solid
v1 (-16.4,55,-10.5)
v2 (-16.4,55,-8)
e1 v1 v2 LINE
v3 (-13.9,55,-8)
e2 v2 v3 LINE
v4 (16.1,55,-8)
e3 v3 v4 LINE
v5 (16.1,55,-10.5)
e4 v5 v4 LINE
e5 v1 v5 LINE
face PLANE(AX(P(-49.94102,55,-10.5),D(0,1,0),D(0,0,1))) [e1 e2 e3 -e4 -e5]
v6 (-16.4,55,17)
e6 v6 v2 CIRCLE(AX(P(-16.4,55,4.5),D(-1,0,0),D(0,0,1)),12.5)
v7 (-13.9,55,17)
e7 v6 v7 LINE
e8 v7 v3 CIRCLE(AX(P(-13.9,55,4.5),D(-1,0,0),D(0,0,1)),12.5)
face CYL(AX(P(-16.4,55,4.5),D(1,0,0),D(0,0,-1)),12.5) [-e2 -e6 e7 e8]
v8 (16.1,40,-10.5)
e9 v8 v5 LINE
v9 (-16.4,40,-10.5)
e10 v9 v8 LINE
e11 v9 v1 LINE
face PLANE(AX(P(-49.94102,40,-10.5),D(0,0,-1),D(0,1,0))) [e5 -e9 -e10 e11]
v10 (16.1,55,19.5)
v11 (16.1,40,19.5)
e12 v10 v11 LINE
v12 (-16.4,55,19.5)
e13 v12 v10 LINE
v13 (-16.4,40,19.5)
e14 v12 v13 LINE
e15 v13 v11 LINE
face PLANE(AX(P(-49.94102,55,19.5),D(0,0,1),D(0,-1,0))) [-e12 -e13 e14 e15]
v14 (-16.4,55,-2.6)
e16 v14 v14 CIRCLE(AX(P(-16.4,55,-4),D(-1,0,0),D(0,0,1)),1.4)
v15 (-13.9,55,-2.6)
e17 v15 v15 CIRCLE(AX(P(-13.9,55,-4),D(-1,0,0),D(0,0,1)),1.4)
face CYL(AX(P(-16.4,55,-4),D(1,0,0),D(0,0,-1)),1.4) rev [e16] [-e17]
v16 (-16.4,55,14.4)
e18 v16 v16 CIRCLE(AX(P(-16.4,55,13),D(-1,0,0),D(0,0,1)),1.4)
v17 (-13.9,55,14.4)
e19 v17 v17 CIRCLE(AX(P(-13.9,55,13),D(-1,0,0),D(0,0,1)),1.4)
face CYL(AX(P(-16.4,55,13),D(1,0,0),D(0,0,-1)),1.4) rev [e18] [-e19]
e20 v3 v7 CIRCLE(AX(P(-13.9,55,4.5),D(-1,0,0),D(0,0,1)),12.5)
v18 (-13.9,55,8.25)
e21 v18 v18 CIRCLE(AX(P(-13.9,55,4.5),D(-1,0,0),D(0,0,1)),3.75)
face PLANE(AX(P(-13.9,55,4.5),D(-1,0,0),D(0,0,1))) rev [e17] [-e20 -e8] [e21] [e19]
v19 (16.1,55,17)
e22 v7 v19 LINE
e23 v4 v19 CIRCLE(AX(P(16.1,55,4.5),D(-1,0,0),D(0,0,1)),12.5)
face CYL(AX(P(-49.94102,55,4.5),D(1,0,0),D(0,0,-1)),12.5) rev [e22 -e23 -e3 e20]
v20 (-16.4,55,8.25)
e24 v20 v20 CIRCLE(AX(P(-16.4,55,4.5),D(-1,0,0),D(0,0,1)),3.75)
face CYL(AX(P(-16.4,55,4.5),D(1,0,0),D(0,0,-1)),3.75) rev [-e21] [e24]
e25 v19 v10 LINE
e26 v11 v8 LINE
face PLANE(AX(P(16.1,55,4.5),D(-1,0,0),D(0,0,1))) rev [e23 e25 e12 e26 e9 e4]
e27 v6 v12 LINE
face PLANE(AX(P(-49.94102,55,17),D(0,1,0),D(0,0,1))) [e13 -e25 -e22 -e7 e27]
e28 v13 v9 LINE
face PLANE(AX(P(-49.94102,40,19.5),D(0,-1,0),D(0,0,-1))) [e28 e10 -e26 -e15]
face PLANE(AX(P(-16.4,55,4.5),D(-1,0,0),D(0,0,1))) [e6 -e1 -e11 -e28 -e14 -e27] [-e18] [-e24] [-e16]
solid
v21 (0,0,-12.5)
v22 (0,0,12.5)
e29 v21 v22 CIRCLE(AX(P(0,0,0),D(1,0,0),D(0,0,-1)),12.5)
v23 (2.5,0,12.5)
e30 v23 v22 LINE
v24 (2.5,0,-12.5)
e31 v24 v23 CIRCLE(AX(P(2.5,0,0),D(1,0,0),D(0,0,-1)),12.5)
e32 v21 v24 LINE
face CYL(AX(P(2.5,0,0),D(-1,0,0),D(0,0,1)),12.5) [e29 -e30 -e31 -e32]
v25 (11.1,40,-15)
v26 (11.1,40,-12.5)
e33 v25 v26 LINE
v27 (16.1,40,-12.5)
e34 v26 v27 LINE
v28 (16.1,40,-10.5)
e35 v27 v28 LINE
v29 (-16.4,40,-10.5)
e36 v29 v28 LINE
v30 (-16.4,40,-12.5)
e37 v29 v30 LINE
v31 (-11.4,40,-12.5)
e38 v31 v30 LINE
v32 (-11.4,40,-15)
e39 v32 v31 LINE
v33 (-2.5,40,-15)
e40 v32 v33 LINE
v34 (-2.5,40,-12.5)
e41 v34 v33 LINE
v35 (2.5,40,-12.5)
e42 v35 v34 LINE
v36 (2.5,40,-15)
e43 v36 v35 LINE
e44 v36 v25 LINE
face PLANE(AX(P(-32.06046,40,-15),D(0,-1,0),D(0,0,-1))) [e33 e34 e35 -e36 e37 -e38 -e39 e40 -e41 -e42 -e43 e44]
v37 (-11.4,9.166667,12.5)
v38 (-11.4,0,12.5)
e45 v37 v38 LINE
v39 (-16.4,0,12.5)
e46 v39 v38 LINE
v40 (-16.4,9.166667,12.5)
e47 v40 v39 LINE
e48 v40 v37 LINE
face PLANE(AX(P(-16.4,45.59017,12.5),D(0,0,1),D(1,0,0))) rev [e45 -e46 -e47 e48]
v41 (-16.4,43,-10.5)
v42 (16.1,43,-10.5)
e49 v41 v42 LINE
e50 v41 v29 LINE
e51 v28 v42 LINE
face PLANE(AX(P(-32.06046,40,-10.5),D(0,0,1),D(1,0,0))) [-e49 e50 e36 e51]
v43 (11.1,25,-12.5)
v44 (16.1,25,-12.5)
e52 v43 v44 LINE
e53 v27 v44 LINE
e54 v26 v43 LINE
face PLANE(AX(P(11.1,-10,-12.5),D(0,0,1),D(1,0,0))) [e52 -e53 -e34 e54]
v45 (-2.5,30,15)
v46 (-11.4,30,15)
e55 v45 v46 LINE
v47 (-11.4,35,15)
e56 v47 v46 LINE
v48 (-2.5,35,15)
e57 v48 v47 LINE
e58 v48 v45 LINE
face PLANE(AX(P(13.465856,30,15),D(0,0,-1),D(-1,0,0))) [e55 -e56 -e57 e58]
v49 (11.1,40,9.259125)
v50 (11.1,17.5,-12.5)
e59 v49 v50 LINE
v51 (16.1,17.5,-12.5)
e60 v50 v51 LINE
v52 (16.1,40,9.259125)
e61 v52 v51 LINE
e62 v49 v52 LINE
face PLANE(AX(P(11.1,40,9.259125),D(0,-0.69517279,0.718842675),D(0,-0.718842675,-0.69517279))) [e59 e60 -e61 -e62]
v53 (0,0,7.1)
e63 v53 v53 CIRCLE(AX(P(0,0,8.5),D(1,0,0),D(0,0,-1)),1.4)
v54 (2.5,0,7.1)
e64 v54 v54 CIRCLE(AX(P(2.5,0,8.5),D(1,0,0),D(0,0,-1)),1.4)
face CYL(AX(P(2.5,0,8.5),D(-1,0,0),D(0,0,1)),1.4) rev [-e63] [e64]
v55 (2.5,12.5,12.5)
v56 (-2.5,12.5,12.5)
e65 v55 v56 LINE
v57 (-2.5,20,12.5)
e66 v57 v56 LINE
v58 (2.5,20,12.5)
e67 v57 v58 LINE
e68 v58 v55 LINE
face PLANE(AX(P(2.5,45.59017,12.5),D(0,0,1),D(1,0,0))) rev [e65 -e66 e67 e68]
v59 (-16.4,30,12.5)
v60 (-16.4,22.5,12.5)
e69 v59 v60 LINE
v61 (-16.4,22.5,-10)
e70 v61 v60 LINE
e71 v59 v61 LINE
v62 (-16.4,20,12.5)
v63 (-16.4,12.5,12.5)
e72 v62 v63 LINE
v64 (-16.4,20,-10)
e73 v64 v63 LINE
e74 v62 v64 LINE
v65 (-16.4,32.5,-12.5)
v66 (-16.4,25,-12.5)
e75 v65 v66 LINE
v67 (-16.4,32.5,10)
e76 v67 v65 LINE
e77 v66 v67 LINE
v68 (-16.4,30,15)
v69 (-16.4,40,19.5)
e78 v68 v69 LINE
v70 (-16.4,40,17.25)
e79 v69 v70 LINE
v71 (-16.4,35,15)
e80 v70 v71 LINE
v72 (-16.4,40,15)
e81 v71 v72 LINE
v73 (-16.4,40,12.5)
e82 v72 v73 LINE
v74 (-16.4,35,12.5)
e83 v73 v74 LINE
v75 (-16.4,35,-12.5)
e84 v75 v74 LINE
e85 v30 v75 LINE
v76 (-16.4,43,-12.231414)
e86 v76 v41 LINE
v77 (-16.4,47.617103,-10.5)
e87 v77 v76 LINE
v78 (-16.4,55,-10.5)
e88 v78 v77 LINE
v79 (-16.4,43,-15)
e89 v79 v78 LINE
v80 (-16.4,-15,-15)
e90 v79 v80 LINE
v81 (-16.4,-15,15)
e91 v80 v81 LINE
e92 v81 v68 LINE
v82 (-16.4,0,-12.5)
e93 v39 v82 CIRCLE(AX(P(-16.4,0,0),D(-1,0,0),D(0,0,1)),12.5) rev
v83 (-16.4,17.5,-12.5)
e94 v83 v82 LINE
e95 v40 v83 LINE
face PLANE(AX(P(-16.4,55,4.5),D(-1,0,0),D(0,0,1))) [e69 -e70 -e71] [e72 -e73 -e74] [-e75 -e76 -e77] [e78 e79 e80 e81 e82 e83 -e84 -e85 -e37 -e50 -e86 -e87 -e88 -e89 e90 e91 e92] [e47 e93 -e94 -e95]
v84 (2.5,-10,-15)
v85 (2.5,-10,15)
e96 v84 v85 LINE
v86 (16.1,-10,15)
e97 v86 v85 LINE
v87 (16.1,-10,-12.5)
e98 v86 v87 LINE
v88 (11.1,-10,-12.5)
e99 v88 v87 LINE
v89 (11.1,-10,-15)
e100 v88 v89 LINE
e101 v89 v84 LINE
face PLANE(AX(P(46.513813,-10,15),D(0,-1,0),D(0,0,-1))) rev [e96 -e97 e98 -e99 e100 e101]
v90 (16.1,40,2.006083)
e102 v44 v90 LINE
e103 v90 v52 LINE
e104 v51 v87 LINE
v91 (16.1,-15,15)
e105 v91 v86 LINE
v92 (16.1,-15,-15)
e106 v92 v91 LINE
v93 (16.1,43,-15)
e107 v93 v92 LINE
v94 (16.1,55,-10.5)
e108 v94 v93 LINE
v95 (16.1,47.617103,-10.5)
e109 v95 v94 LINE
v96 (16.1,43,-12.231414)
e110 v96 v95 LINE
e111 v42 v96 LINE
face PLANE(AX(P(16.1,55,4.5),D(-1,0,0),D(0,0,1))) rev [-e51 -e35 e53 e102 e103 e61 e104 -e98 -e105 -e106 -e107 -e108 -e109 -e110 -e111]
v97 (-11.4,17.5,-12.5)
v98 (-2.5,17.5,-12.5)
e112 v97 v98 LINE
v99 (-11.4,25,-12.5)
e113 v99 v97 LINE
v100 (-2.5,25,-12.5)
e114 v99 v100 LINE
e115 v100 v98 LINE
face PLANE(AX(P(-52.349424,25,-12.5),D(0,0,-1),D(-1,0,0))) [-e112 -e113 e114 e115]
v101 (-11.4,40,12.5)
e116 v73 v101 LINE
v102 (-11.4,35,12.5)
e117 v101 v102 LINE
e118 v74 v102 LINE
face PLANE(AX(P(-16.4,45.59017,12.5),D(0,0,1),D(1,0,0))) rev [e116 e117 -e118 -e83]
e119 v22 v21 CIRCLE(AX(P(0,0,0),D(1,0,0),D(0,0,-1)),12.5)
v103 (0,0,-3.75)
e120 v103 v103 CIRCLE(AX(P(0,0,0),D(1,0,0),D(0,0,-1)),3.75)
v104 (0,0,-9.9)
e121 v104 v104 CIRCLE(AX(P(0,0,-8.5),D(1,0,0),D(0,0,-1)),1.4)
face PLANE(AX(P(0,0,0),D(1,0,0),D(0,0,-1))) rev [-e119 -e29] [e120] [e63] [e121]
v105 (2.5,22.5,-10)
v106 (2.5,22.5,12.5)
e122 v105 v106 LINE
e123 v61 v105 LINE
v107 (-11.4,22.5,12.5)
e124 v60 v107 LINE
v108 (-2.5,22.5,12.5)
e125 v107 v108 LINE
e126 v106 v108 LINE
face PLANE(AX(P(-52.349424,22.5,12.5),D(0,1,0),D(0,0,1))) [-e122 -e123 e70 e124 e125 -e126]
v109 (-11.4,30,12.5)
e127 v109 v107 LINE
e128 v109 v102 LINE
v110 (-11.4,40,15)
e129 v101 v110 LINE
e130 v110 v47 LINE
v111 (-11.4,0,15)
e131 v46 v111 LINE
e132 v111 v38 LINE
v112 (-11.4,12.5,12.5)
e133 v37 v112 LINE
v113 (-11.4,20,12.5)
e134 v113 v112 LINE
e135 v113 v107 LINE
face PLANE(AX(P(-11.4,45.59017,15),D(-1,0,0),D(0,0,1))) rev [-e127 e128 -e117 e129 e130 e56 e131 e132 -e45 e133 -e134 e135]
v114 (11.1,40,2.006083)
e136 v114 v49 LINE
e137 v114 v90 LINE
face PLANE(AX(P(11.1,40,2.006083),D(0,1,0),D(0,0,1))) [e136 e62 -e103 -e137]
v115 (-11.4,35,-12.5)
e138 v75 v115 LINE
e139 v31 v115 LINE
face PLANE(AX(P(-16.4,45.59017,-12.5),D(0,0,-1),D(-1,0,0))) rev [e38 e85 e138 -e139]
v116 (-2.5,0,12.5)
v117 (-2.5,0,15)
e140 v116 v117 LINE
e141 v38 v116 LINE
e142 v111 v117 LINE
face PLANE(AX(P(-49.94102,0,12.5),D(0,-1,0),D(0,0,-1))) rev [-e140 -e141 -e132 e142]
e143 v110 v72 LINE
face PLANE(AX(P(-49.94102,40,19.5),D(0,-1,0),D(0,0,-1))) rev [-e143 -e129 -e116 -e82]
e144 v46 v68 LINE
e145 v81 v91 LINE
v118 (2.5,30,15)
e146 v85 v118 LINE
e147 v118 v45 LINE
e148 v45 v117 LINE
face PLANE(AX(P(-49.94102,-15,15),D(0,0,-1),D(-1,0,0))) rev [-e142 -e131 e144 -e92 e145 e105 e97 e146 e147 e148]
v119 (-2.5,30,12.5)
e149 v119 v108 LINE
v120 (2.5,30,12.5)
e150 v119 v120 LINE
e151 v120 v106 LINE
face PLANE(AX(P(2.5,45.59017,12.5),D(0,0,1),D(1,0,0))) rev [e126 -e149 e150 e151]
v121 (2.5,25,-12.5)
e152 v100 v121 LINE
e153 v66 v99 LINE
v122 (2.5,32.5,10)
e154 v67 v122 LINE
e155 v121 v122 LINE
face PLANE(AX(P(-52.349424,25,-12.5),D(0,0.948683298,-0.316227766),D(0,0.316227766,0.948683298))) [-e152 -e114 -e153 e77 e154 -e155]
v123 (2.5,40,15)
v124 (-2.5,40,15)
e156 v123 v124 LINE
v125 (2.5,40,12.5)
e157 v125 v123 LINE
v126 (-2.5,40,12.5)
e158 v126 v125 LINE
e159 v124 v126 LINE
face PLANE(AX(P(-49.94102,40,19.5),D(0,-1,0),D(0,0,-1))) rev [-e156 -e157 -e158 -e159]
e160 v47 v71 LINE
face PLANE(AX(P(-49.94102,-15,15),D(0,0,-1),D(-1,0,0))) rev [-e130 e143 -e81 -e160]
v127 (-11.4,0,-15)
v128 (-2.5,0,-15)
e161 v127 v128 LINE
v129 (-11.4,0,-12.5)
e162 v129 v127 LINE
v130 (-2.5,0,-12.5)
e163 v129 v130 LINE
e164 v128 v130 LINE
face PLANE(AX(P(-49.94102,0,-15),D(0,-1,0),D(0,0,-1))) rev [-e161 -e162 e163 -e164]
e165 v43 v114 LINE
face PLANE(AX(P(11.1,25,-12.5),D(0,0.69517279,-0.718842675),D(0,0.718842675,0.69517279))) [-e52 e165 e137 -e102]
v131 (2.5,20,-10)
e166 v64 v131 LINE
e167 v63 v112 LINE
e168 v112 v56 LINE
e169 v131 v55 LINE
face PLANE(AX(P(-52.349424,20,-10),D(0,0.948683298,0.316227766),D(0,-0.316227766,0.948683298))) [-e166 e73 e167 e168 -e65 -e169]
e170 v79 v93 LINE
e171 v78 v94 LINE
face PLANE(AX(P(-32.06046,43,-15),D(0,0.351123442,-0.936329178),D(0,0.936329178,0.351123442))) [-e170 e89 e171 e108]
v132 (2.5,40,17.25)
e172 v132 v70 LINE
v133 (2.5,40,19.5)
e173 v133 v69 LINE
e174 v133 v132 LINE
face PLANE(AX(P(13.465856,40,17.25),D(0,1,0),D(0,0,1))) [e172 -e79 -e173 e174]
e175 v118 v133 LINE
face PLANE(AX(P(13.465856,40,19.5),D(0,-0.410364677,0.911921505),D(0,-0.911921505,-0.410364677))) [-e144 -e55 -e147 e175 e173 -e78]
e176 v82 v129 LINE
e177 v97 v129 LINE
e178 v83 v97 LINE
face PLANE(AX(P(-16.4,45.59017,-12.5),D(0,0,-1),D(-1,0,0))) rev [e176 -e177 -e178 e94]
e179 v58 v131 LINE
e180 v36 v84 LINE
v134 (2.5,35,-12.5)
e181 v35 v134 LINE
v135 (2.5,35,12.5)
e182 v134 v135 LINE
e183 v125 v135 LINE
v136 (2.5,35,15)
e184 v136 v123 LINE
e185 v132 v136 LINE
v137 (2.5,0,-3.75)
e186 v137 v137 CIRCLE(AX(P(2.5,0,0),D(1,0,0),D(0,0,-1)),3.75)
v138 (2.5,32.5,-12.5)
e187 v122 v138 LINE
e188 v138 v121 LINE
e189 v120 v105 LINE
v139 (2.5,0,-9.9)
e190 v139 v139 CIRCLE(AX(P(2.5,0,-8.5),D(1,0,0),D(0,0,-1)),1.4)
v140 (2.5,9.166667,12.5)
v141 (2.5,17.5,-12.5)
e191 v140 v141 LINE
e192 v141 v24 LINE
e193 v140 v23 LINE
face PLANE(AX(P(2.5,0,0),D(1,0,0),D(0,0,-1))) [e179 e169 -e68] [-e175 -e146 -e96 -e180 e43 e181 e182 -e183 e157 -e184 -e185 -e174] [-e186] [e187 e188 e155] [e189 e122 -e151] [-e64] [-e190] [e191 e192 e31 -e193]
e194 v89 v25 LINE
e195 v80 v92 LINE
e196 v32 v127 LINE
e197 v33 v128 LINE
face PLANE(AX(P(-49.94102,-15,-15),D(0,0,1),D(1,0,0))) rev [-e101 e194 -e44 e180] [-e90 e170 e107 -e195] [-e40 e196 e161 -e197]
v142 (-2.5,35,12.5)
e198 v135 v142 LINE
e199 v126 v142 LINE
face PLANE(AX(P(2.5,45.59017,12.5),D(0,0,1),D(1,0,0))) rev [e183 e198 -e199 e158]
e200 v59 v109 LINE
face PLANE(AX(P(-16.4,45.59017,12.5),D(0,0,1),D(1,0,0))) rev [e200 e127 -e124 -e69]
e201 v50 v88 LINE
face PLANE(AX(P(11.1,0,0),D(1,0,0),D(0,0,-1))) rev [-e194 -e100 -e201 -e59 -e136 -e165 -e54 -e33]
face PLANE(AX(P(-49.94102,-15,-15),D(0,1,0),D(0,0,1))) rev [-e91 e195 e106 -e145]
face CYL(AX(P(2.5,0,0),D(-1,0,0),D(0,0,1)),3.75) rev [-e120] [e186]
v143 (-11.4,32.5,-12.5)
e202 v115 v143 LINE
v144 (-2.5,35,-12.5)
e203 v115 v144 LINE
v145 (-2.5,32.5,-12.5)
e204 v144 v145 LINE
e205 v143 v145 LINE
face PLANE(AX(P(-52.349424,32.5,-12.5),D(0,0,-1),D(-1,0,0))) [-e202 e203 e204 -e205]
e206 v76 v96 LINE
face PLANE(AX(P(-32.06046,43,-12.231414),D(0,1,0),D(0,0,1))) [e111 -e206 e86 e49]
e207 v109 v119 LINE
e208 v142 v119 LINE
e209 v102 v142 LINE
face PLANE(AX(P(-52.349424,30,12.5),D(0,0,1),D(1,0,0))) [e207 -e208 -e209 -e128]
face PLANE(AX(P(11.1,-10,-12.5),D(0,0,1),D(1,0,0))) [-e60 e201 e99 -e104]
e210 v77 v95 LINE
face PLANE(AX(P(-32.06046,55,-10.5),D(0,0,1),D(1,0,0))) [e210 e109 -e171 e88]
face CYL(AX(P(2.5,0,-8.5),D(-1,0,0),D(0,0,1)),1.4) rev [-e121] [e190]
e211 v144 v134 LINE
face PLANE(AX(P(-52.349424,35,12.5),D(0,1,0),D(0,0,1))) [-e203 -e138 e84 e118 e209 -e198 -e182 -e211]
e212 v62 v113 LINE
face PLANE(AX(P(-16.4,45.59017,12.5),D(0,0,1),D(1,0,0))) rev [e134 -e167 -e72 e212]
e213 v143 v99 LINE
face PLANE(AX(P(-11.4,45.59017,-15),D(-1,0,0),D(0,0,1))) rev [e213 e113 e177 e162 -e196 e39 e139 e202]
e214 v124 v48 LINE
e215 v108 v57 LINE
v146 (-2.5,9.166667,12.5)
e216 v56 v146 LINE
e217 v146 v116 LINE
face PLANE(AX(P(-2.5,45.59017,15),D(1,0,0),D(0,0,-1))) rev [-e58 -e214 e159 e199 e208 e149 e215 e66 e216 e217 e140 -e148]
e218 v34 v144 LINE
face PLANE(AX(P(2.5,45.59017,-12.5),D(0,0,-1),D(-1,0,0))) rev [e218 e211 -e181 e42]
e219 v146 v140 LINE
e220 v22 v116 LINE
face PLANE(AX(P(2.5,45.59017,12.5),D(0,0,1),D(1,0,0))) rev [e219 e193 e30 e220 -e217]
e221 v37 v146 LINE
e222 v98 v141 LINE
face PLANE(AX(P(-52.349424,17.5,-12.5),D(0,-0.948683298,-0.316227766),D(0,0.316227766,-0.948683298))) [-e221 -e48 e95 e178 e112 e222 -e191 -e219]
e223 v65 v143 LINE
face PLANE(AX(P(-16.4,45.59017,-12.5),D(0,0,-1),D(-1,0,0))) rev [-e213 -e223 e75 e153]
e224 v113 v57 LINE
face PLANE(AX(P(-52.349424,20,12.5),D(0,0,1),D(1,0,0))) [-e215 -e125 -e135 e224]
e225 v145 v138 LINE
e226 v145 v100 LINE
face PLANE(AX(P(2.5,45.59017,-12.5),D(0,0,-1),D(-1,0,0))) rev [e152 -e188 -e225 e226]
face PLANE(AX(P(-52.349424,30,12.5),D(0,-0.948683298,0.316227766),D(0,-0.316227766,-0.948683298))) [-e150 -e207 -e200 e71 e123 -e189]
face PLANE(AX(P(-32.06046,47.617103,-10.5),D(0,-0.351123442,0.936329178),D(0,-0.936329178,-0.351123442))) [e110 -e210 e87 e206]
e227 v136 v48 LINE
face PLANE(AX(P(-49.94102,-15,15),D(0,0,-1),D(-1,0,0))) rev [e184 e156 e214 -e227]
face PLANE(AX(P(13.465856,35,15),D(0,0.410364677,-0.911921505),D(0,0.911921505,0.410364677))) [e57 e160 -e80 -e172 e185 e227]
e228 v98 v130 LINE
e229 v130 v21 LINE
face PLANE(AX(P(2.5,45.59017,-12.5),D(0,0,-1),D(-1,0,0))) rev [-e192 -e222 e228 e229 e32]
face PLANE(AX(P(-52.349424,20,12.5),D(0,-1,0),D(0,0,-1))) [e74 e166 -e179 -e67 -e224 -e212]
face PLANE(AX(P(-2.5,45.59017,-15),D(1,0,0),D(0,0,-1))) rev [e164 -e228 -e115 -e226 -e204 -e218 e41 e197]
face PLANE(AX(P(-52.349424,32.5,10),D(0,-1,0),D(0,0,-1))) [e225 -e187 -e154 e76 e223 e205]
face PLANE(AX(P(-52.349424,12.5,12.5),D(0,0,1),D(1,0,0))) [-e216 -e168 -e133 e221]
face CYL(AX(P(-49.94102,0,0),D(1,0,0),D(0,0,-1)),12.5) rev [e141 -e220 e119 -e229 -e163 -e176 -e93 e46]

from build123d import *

# Parameters (mm, degrees)
SKETCH1_R                        = 12.5
SKETCH1_R_2                      = 3.75
SKETCH1_R_3                      = 1.4
BOSS_EXTRUDE1_DEPTH              = 2.5
BOSS_EXTRUDE12_START             = 2.5
SKETCH14_R                       = 12.5
SKETCH14_R_2                     = 3.75
SKETCH14_R_3                     = 1.4
BOSS_EXTRUDE12_DEPTH             = 2.5
BOSS_EXTRUDE13_START             = -2.5
BOSS_EXTRUDE13_DEPTH             = 18.9
BOSS_EXTRUDE14_DEPTH             = 30
BOSS_EXTRUDE14_DIRECTION_2_REACH = 73.514
SKETCH17_W                       = 5
SKETCH17_H                       = 2.5
BOSS_EXTRUDE15_DEPTH             = 40
SKETCH19_W                       = 5
SKETCH19_H                       = 2.5
BOSS_EXTRUDE16_DEPTH             = 40
BOSS_EXTRUDE17_START             = -18.9
BOSS_EXTRUDE17_DEPTH             = 32.5
BOSS_EXTRUDE19_START             = -18.9
BOSS_EXTRUDE19_DEPTH             = 18.9
BOSS_EXTRUDE20_START             = -18.9
BOSS_EXTRUDE20_DEPTH             = 18.9
SKETCH24_W                       = 30
SKETCH24_H                       = 5
BOSS_EXTRUDE21_DEPTH             = 13.6
SKETCH25_W                       = 2.5
SKETCH25_H                       = 50
BOSS_EXTRUDE22_DEPTH             = 5
BOSS_EXTRUDE23_DEPTH             = 5


# Read off the part's stored shape, not the designer's step: Boss-Extrude20
with BuildPart() as part:
    # Sketch1 → Boss-Extrude1 (new body)
    with BuildSketch(Plane(origin=(0, 0, 0), x_dir=(0, 0, -1), z_dir=(1, 0, 0))):
        Circle(SKETCH1_R)
        Circle(SKETCH1_R_2, mode=Mode.SUBTRACT)
        with Locations((8.5, 0)):
            Circle(SKETCH1_R_3, mode=Mode.SUBTRACT)
        with Locations((-8.5, 0)):
            Circle(SKETCH1_R_3, mode=Mode.SUBTRACT)
    extrude(amount=BOSS_EXTRUDE1_DEPTH)

    # Sketch15 → Boss-Extrude13 (add)
    with BuildSketch(Plane.ZY.offset(BOSS_EXTRUDE13_START)):
        with BuildLine():
            Line((-15, -15), (15, -15))
            Line((15, -15), (15, 0))
            Line((15, 0), (12.5, 0))
            ThreePointArc((12.5, 0), (0, -12.5), (-12.5, 0))
            Line((-12.5, 0), (-15, 0))
            Line((-15, 0), (-15, -15))
        make_face()
    extrude(amount=BOSS_EXTRUDE13_DEPTH)

    # Sketch17 → Boss-Extrude15 (add)
    with BuildSketch(Plane(origin=(0, 0, 0), x_dir=(1, 0, 0), z_dir=(0, 1, 0))):
        with Locations((-13.9, 13.75)):
            Rectangle(SKETCH17_W, SKETCH17_H)
        with Locations((0, 13.75)):
            Rectangle(SKETCH17_W, SKETCH17_H)
    extrude(amount=BOSS_EXTRUDE15_DEPTH)

    # Sketch19 → Boss-Extrude16 (add)
    with BuildSketch(Plane(origin=(0, 0, 0), x_dir=(1, 0, 0), z_dir=(0, 1, 0))):
        with Locations((-13.9, -13.75)):
            Rectangle(SKETCH19_W, SKETCH19_H)
        with Locations((0, -13.75)):
            Rectangle(SKETCH19_W, SKETCH19_H)
    extrude(amount=BOSS_EXTRUDE16_DEPTH)

    # Sketch20 → Boss-Extrude17 (add)
    with BuildSketch(Plane(origin=(2.5, 0, 0), x_dir=(0, 0, -1), z_dir=(1, 0, 0)).offset(BOSS_EXTRUDE17_START)):
        Polygon((15, 40), (10.5, 40), (10.5, 43), (12.23141351, 43), (10.5, 47.617102692), (10.5, 55), (15, 43), align=None)
    extrude(amount=BOSS_EXTRUDE17_DEPTH)

    # Sketch22 → Boss-Extrude19 (add)
    with BuildSketch(Plane(origin=(2.5, 0, 0), x_dir=(0, 0, -1), z_dir=(1, 0, 0)).offset(BOSS_EXTRUDE19_START)):
        Polygon((-12.5, 20), (10, 20), (-12.5, 12.5), (-12.5, 9.166666667), (12.5, 17.5), (12.5, 20), (12.5, 22.5), (12.5, 25), (-10, 32.5), (12.5, 32.5), (12.5, 35), (-12.5, 35), (-12.5, 32.5), (-12.5, 30), (10, 22.5), (-12.5, 22.5), align=None)
    extrude(amount=BOSS_EXTRUDE19_DEPTH)

    # Boss-Extrude20 outline → Boss-Extrude20 (add)
    with BuildSketch(Plane.ZY.offset(16.4).offset(BOSS_EXTRUDE20_START)):
        Polygon((15, 30), (19.5, 40), (17.25, 40), (15, 35), align=None)
    extrude(amount=BOSS_EXTRUDE20_DEPTH)

    # Sketch24 → Boss-Extrude21 (add)
    with BuildSketch(Plane(origin=(2.5, 0, 0), x_dir=(0, 0, -1), z_dir=(1, 0, 0))):
        with Locations((0, -12.5)):
            Rectangle(SKETCH24_W, SKETCH24_H)
    extrude(amount=BOSS_EXTRUDE21_DEPTH)

    # Sketch25 → Boss-Extrude22 (add)
    with BuildSketch(Plane(origin=(16.1, 0, 0), x_dir=(0, 0, -1), z_dir=(1, 0, 0))):
        with Locations((13.75, 15)):
            Rectangle(SKETCH25_W, SKETCH25_H)
    extrude(amount=-BOSS_EXTRUDE22_DEPTH)

    # Sketch26 → Boss-Extrude23 (add)
    with BuildSketch(Plane(origin=(16.1, 0, 0), x_dir=(0, 0, -1), z_dir=(1, 0, 0))):
        Polygon((-9.259125201, 40), (12.5, 17.5), (12.5, 25), (-2.006083467, 40), align=None)
    extrude(amount=-BOSS_EXTRUDE23_DEPTH)


with BuildPart() as body_2:
    # Sketch14 → Boss-Extrude12 (new body)
    with BuildSketch(Plane.ZY.offset(11.4).offset(BOSS_EXTRUDE12_START)):
        with Locations((4.5, 55)):
            Circle(SKETCH14_R)
        with Locations((4.5, 55)):
            Circle(SKETCH14_R_2, mode=Mode.SUBTRACT)
        with Locations((-4, 55)):
            Circle(SKETCH14_R_3, mode=Mode.SUBTRACT)
        with Locations((13, 55)):
            Circle(SKETCH14_R_3, mode=Mode.SUBTRACT)
    extrude(amount=BOSS_EXTRUDE12_DEPTH)

    # Sketch16 → Boss-Extrude14 (add)
    with BuildSketch(Plane(origin=(-13.9, 0, 0), x_dir=(0, 0, -1), z_dir=(1, 0, 0))):
        with BuildLine():
            Line((-17, 55), (-19.5, 55))
            Line((-19.5, 55), (-19.5, 40))
            Line((-19.5, 40), (10.5, 40))
            Line((10.5, 40), (10.5, 55))
            Line((10.5, 55), (8, 55))
            ThreePointArc((8, 55), (-4.5, 42.5), (-17, 55))
        make_face()
    extrude(amount=BOSS_EXTRUDE14_DEPTH)

    # Boss-Extrude14 direction 2: up to this face of the body (flat: up to its plane)
    boss_extrude14_direction_2_end = Plane(body_2.part.faces().sort_by_distance((-16.4, 55, -7.646446609))[0])
    # Sketch16 → Boss-Extrude14 direction 2 (add, up to the picked face)
    with BuildSketch(Plane(origin=(-13.9, 0, 0), x_dir=(0, 0, -1), z_dir=(1, 0, 0)), mode=Mode.PRIVATE) as boss_extrude14_direction_2_sk1:
        with BuildLine():
            Line((-17, 55), (-19.5, 55))
            Line((-19.5, 55), (-19.5, 40))
            Line((-19.5, 40), (10.5, 40))
            Line((10.5, 40), (10.5, 55))
            Line((10.5, 55), (8, 55))
            ThreePointArc((8, 55), (-4.5, 42.5), (-17, 55))
        make_face()
    boss_extrude14_direction_2_tool1 = split(extrude(boss_extrude14_direction_2_sk1.sketch, amount=-BOSS_EXTRUDE14_DIRECTION_2_REACH, mode=Mode.PRIVATE), bisect_by=boss_extrude14_direction_2_end, keep=Keep.BOTH, mode=Mode.PRIVATE)
    add(boss_extrude14_direction_2_tool1.solids().sort_by(Axis((-13.9, 42.16459, 4.5), (-1, 0, 0)))[0])


solid = Compound([part.part, body_2.part])
